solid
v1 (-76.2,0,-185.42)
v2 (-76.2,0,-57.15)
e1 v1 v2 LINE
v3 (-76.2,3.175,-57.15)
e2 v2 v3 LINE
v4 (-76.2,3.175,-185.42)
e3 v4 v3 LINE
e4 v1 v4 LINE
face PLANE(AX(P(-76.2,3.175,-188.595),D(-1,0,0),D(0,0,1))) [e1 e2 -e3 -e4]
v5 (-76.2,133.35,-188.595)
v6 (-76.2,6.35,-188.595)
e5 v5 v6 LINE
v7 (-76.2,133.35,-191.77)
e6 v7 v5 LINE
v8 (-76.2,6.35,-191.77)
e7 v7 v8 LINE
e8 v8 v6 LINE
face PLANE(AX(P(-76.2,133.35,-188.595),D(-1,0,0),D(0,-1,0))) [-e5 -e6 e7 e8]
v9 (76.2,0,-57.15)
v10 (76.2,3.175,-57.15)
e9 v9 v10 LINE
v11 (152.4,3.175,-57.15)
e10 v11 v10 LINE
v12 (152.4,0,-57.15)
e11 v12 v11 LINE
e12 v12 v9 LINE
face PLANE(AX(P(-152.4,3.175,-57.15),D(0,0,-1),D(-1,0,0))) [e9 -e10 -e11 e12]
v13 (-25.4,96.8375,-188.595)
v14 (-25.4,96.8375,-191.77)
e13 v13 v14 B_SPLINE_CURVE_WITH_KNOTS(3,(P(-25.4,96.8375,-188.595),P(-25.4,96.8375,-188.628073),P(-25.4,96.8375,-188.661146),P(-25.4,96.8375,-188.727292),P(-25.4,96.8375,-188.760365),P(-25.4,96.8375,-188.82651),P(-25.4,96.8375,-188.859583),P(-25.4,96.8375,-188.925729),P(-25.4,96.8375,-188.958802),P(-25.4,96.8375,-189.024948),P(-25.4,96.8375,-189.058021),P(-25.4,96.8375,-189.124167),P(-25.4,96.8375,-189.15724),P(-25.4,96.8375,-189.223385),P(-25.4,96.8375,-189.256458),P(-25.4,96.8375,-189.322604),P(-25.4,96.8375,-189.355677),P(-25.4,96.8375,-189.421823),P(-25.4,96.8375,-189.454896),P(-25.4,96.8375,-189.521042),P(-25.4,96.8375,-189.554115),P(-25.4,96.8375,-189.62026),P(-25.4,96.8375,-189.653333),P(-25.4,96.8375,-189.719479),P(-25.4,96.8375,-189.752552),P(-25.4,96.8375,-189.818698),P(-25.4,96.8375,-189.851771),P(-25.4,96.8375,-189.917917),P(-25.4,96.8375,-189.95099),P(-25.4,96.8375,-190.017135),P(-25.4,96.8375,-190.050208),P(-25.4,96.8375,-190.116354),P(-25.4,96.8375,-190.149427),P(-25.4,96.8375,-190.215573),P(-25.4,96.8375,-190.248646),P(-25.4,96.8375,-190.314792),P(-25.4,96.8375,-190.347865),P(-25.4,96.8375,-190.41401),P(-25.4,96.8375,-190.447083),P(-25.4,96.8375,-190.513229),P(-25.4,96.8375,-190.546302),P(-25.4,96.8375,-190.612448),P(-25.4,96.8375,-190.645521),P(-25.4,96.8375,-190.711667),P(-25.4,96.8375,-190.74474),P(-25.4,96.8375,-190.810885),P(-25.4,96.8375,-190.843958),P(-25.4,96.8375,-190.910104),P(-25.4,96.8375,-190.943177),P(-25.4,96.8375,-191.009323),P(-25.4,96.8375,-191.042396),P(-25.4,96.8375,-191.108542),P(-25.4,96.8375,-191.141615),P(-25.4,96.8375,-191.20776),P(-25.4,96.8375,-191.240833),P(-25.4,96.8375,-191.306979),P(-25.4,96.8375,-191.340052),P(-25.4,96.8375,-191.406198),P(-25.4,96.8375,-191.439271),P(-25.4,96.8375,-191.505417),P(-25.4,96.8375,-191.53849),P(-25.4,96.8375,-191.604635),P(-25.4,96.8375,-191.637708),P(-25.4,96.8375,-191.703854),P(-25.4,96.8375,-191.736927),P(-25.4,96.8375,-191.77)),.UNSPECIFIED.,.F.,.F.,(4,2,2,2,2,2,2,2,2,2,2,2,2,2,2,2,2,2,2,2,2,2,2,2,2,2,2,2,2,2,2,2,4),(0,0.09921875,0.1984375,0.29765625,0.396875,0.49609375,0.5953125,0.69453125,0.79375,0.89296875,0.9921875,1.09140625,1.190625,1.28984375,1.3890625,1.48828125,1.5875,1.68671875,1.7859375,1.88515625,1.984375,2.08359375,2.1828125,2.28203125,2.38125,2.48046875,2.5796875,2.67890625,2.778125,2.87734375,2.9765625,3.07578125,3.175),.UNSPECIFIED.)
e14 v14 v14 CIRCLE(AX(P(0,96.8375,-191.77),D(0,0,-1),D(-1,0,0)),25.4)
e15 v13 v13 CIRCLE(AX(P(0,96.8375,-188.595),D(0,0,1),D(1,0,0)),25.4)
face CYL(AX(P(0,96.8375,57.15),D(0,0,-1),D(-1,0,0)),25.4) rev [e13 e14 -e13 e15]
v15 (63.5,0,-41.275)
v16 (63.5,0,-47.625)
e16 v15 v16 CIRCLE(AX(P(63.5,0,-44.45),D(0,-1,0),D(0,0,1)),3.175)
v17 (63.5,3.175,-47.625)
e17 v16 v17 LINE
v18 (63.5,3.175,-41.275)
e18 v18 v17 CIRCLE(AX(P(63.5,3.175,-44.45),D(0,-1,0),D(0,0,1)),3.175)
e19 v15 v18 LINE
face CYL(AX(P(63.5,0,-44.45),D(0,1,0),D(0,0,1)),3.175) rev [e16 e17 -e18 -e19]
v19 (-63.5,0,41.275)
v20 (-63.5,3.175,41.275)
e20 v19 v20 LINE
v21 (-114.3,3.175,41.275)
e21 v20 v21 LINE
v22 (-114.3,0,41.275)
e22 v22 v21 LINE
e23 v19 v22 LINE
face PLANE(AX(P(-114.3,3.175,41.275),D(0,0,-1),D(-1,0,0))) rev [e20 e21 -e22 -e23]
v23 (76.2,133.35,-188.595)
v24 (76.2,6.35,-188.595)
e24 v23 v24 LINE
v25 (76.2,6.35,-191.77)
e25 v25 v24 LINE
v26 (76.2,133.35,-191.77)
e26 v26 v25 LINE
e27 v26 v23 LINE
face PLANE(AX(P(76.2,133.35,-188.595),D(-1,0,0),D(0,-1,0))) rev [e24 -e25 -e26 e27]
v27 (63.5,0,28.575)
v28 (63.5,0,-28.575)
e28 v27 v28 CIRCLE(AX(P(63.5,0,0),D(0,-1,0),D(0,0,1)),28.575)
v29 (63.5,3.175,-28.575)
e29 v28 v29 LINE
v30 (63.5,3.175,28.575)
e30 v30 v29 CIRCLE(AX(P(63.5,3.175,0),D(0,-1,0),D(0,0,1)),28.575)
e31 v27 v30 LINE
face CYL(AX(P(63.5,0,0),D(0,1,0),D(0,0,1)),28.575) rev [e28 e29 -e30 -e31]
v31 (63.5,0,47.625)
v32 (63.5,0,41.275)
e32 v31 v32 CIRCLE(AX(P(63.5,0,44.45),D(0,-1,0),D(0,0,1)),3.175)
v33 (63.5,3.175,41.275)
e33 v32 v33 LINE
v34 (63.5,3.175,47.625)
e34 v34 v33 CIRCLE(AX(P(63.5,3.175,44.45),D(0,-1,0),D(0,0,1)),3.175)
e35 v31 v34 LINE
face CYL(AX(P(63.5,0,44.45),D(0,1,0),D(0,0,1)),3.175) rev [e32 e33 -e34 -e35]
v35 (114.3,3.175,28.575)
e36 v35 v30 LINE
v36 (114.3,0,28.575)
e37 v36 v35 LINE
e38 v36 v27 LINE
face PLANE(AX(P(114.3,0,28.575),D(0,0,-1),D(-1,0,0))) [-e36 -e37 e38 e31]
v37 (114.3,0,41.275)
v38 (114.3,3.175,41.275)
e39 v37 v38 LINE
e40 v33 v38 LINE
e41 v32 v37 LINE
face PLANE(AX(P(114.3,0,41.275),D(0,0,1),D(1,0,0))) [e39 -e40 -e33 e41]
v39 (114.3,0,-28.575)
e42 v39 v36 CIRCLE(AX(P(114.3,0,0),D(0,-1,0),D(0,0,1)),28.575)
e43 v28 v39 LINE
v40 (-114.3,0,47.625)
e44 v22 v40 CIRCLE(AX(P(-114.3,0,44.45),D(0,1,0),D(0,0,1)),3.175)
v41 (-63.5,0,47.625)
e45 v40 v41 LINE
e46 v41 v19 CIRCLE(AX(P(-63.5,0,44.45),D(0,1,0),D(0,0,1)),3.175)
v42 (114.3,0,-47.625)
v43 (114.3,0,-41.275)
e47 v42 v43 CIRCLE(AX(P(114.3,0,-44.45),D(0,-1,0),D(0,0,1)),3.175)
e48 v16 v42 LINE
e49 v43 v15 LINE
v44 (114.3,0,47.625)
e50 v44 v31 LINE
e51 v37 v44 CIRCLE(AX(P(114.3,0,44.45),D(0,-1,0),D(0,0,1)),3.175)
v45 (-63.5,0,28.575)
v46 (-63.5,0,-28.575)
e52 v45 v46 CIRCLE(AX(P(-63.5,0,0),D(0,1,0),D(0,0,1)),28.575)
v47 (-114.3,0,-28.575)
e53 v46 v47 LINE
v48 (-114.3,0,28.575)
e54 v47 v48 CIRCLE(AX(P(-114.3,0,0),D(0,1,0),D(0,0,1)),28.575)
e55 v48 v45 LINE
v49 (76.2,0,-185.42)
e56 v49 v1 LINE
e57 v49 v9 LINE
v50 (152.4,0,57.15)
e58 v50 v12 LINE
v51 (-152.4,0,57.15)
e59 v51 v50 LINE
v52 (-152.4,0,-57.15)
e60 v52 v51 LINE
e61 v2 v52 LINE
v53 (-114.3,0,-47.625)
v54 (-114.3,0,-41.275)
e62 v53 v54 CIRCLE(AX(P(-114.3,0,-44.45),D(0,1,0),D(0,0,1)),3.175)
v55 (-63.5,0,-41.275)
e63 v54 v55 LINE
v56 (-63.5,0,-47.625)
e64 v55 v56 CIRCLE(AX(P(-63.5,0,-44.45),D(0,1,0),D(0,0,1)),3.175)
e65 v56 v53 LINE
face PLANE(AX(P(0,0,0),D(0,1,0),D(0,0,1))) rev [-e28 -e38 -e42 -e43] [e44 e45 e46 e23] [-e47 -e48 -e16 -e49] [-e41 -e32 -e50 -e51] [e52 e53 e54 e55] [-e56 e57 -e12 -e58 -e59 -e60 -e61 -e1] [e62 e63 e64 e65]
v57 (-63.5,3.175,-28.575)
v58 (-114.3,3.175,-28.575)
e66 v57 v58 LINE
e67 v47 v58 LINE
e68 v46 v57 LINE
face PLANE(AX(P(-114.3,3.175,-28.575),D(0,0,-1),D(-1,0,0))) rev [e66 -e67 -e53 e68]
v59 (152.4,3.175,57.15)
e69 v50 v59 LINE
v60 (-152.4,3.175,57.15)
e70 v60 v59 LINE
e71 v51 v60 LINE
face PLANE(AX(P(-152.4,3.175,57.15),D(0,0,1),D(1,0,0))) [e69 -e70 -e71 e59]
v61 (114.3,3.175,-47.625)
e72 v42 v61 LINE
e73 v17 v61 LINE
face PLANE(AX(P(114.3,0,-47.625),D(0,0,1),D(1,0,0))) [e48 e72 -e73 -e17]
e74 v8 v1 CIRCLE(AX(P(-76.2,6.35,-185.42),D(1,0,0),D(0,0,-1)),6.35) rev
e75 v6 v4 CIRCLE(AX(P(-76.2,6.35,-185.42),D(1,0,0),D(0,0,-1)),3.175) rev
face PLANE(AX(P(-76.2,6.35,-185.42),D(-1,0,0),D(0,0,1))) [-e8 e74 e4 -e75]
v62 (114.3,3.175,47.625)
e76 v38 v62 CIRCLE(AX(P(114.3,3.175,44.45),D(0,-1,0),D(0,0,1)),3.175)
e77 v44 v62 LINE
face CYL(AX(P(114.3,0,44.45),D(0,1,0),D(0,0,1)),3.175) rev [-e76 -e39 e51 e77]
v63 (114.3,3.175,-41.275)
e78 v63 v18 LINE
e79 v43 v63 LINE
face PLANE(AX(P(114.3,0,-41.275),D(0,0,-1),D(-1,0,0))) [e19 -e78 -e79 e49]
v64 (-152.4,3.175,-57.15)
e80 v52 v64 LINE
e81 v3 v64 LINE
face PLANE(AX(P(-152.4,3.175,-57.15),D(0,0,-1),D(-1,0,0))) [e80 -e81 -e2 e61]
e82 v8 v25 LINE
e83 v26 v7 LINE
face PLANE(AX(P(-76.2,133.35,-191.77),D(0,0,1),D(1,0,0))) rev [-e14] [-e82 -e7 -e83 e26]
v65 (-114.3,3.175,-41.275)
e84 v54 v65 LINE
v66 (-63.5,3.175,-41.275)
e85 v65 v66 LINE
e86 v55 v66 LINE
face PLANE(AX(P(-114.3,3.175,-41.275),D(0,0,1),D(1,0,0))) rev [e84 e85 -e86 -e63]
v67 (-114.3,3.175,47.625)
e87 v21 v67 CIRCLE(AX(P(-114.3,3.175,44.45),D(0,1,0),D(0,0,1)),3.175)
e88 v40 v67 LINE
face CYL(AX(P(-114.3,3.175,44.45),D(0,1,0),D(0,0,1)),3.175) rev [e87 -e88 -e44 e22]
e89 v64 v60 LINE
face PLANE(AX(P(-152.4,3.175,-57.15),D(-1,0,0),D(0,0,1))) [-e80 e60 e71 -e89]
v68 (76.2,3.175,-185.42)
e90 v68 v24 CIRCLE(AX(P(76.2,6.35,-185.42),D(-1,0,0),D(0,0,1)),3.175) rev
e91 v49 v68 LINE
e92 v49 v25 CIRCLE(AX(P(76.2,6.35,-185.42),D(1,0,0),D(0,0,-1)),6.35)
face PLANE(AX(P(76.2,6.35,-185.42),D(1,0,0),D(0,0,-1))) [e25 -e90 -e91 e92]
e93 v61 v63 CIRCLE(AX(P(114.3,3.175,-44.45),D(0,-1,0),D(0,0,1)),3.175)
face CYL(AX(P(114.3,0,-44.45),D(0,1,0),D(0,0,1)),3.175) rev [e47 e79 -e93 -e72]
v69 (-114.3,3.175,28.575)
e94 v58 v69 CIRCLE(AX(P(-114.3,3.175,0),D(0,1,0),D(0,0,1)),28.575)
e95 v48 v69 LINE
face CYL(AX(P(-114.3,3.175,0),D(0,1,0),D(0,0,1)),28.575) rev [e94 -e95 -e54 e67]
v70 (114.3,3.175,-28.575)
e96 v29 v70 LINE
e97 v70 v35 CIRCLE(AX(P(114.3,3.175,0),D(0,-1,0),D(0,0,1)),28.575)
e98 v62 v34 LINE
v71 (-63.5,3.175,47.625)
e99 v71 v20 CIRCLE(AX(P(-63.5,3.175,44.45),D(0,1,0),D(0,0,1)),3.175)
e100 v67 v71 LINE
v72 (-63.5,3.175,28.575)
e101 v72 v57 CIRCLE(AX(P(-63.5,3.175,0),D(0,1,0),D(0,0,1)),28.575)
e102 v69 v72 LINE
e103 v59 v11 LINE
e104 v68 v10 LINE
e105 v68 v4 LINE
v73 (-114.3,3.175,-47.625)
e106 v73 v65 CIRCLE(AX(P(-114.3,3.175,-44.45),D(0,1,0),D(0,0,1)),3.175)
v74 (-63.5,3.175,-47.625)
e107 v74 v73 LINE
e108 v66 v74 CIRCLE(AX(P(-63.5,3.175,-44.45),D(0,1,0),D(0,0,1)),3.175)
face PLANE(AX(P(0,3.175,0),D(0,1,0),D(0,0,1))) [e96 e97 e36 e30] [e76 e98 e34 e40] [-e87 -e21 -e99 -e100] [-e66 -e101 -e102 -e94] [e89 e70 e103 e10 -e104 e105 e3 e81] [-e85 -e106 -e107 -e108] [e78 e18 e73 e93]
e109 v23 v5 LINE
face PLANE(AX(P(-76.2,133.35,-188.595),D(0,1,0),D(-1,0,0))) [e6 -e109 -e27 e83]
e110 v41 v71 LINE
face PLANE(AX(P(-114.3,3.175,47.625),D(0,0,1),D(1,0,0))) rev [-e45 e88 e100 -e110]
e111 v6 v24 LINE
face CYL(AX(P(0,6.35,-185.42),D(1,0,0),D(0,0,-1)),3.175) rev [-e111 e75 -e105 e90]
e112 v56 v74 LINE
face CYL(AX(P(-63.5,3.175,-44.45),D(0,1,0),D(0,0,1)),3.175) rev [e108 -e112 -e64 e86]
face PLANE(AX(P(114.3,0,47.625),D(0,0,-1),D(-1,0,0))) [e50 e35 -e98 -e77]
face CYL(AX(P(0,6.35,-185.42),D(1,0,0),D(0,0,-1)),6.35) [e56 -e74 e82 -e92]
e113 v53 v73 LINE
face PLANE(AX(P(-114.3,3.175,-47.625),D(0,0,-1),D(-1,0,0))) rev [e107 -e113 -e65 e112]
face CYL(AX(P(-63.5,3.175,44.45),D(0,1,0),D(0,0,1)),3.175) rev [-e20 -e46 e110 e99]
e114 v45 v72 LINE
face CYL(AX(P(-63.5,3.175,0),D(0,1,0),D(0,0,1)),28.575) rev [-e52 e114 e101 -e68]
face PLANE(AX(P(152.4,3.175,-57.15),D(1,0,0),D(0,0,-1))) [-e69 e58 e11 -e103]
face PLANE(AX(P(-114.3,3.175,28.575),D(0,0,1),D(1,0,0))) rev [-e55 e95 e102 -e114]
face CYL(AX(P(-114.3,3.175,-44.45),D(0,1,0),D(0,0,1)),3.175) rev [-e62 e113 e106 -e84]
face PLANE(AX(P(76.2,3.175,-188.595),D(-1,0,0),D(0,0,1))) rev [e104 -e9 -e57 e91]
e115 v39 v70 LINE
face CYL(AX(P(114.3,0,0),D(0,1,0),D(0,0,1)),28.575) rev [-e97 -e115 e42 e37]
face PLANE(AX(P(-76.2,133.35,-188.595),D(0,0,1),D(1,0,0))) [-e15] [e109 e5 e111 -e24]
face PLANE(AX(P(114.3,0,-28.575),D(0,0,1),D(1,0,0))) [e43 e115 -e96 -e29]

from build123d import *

# Parameters (mm, degrees)
SKETCH1_W              = 304.8
SKETCH1_H              = 114.3
BOSS_EXTRUDE1_DEPTH    = 3.175
CUT_EXTRUDE1_DEPTH     = 163.79423554
SKETCH3_W              = 152.4
SKETCH3_H              = 3.175
BOSS_EXTRUDE2_DEPTH    = 131.445
SKETCH4_W              = 152.4
SKETCH4_H              = 3.175
BOSS_EXTRUDE3_DEPTH    = 133.35
CONVERT_SOLID1_START   = -76.2
CONVERT_SOLID1_DEPTH   = 152.4
CONVERT_SOLID1_2_DEPTH = 152.4
SKETCH5_R              = 25.4
CUT_EXTRUDE2_DEPTH     = 321.888062882


# Read off the part's stored shape, not the designer's step: Convert-Solid1
with BuildPart() as part:
    # Sketch1 → Boss-Extrude1 (new body)
    with BuildSketch(Plane(origin=(0, 0, 0), x_dir=(1, 0, 0), z_dir=(0, 1, 0))):
        Rectangle(SKETCH1_W, SKETCH1_H)
    extrude(amount=BOSS_EXTRUDE1_DEPTH)

    # Sketch2 → Cut-Extrude1 (cut, through all)
    with BuildSketch(Plane(origin=(0, 3.175, 0), x_dir=(1, 0, 0), z_dir=(0, 1, 0))):
        with BuildLine():
            Line((-114.3, -41.275), (-63.5, -41.275))
            ThreePointArc((-63.5, -41.275), (-60.325, -44.45), (-63.5, -47.625))
            Line((-63.5, -47.625), (-114.3, -47.625))
            ThreePointArc((-114.3, -47.625), (-117.475, -44.45), (-114.3, -41.275))
        make_face()
        with BuildLine():
            Line((-114.3, 47.625), (-63.5, 47.625))
            ThreePointArc((-63.5, 47.625), (-60.325, 44.45), (-63.5, 41.275))
            Line((-63.5, 41.275), (-114.3, 41.275))
            ThreePointArc((-114.3, 41.275), (-117.475, 44.45), (-114.3, 47.625))
        make_face()
        with BuildLine():
            Line((-114.3, 28.575), (-63.5, 28.575))
            ThreePointArc((-63.5, 28.575), (-34.925, 0), (-63.5, -28.575))
            Line((-63.5, -28.575), (-114.3, -28.575))
            ThreePointArc((-114.3, -28.575), (-142.875, 0), (-114.3, 28.575))
        make_face()
    cut_extrude1 = extrude(amount=-CUT_EXTRUDE1_DEPTH, mode=Mode.SUBTRACT)

    # Sketch3 → Boss-Extrude2 (add)
    with BuildSketch(Plane.XY.offset(-57.15)):
        with Locations((0, 1.5875)):
            Rectangle(SKETCH3_W, SKETCH3_H)
    extrude(amount=-BOSS_EXTRUDE2_DEPTH)

    # Sketch4 → Boss-Extrude3 (add)
    with BuildSketch(Plane(origin=(0, 0, 0), x_dir=(-1, 0, 0), z_dir=(0, -1, 0))):
        with Locations((0, 190.1825)):
            Rectangle(SKETCH4_W, SKETCH4_H)
    extrude(amount=-BOSS_EXTRUDE3_DEPTH)

    # Convert-Solid1 outline → Convert-Solid1 (cut)
    with BuildSketch(Plane.YZ.offset(CONVERT_SOLID1_START)):
        with BuildLine():
            ThreePointArc((6.35, -191.77), (1.859871939, -189.910128061), (0, -185.42))
            Line((0, -185.42), (0, -191.77))
            Line((0, -191.77), (6.35, -191.77))
        make_face()
    extrude(amount=CONVERT_SOLID1_DEPTH, mode=Mode.SUBTRACT)

    # Convert-Solid1 2 outline → Convert-Solid1 2 (add)
    with BuildSketch(Plane.YZ.offset(CONVERT_SOLID1_START)):
        with BuildLine():
            ThreePointArc((6.35, -188.595), (4.10493597, -187.66506403), (3.175, -185.42))
            Line((3.175, -185.42), (3.175, -188.595))
            Line((3.175, -188.595), (6.35, -188.595))
        make_face()
    extrude(amount=CONVERT_SOLID1_2_DEPTH)

    # Mirror1: Cut-Extrude1 across plane
    add(cut_extrude1.mirror(Plane(origin=(0, 0, 0), x_dir=(0, 0, 1), z_dir=(1, 0, 0))), mode=Mode.SUBTRACT)

    # Sketch5 → Cut-Extrude2 (cut, through all)
    with BuildSketch(Plane(origin=(0, 0, -191.77), x_dir=(-1, 0, 0), z_dir=(0, 0, -1))):
        with Locations((0, 96.8375)):
            Circle(SKETCH5_R)
    extrude(amount=-CUT_EXTRUDE2_DEPTH, mode=Mode.SUBTRACT)


solid = part.part
